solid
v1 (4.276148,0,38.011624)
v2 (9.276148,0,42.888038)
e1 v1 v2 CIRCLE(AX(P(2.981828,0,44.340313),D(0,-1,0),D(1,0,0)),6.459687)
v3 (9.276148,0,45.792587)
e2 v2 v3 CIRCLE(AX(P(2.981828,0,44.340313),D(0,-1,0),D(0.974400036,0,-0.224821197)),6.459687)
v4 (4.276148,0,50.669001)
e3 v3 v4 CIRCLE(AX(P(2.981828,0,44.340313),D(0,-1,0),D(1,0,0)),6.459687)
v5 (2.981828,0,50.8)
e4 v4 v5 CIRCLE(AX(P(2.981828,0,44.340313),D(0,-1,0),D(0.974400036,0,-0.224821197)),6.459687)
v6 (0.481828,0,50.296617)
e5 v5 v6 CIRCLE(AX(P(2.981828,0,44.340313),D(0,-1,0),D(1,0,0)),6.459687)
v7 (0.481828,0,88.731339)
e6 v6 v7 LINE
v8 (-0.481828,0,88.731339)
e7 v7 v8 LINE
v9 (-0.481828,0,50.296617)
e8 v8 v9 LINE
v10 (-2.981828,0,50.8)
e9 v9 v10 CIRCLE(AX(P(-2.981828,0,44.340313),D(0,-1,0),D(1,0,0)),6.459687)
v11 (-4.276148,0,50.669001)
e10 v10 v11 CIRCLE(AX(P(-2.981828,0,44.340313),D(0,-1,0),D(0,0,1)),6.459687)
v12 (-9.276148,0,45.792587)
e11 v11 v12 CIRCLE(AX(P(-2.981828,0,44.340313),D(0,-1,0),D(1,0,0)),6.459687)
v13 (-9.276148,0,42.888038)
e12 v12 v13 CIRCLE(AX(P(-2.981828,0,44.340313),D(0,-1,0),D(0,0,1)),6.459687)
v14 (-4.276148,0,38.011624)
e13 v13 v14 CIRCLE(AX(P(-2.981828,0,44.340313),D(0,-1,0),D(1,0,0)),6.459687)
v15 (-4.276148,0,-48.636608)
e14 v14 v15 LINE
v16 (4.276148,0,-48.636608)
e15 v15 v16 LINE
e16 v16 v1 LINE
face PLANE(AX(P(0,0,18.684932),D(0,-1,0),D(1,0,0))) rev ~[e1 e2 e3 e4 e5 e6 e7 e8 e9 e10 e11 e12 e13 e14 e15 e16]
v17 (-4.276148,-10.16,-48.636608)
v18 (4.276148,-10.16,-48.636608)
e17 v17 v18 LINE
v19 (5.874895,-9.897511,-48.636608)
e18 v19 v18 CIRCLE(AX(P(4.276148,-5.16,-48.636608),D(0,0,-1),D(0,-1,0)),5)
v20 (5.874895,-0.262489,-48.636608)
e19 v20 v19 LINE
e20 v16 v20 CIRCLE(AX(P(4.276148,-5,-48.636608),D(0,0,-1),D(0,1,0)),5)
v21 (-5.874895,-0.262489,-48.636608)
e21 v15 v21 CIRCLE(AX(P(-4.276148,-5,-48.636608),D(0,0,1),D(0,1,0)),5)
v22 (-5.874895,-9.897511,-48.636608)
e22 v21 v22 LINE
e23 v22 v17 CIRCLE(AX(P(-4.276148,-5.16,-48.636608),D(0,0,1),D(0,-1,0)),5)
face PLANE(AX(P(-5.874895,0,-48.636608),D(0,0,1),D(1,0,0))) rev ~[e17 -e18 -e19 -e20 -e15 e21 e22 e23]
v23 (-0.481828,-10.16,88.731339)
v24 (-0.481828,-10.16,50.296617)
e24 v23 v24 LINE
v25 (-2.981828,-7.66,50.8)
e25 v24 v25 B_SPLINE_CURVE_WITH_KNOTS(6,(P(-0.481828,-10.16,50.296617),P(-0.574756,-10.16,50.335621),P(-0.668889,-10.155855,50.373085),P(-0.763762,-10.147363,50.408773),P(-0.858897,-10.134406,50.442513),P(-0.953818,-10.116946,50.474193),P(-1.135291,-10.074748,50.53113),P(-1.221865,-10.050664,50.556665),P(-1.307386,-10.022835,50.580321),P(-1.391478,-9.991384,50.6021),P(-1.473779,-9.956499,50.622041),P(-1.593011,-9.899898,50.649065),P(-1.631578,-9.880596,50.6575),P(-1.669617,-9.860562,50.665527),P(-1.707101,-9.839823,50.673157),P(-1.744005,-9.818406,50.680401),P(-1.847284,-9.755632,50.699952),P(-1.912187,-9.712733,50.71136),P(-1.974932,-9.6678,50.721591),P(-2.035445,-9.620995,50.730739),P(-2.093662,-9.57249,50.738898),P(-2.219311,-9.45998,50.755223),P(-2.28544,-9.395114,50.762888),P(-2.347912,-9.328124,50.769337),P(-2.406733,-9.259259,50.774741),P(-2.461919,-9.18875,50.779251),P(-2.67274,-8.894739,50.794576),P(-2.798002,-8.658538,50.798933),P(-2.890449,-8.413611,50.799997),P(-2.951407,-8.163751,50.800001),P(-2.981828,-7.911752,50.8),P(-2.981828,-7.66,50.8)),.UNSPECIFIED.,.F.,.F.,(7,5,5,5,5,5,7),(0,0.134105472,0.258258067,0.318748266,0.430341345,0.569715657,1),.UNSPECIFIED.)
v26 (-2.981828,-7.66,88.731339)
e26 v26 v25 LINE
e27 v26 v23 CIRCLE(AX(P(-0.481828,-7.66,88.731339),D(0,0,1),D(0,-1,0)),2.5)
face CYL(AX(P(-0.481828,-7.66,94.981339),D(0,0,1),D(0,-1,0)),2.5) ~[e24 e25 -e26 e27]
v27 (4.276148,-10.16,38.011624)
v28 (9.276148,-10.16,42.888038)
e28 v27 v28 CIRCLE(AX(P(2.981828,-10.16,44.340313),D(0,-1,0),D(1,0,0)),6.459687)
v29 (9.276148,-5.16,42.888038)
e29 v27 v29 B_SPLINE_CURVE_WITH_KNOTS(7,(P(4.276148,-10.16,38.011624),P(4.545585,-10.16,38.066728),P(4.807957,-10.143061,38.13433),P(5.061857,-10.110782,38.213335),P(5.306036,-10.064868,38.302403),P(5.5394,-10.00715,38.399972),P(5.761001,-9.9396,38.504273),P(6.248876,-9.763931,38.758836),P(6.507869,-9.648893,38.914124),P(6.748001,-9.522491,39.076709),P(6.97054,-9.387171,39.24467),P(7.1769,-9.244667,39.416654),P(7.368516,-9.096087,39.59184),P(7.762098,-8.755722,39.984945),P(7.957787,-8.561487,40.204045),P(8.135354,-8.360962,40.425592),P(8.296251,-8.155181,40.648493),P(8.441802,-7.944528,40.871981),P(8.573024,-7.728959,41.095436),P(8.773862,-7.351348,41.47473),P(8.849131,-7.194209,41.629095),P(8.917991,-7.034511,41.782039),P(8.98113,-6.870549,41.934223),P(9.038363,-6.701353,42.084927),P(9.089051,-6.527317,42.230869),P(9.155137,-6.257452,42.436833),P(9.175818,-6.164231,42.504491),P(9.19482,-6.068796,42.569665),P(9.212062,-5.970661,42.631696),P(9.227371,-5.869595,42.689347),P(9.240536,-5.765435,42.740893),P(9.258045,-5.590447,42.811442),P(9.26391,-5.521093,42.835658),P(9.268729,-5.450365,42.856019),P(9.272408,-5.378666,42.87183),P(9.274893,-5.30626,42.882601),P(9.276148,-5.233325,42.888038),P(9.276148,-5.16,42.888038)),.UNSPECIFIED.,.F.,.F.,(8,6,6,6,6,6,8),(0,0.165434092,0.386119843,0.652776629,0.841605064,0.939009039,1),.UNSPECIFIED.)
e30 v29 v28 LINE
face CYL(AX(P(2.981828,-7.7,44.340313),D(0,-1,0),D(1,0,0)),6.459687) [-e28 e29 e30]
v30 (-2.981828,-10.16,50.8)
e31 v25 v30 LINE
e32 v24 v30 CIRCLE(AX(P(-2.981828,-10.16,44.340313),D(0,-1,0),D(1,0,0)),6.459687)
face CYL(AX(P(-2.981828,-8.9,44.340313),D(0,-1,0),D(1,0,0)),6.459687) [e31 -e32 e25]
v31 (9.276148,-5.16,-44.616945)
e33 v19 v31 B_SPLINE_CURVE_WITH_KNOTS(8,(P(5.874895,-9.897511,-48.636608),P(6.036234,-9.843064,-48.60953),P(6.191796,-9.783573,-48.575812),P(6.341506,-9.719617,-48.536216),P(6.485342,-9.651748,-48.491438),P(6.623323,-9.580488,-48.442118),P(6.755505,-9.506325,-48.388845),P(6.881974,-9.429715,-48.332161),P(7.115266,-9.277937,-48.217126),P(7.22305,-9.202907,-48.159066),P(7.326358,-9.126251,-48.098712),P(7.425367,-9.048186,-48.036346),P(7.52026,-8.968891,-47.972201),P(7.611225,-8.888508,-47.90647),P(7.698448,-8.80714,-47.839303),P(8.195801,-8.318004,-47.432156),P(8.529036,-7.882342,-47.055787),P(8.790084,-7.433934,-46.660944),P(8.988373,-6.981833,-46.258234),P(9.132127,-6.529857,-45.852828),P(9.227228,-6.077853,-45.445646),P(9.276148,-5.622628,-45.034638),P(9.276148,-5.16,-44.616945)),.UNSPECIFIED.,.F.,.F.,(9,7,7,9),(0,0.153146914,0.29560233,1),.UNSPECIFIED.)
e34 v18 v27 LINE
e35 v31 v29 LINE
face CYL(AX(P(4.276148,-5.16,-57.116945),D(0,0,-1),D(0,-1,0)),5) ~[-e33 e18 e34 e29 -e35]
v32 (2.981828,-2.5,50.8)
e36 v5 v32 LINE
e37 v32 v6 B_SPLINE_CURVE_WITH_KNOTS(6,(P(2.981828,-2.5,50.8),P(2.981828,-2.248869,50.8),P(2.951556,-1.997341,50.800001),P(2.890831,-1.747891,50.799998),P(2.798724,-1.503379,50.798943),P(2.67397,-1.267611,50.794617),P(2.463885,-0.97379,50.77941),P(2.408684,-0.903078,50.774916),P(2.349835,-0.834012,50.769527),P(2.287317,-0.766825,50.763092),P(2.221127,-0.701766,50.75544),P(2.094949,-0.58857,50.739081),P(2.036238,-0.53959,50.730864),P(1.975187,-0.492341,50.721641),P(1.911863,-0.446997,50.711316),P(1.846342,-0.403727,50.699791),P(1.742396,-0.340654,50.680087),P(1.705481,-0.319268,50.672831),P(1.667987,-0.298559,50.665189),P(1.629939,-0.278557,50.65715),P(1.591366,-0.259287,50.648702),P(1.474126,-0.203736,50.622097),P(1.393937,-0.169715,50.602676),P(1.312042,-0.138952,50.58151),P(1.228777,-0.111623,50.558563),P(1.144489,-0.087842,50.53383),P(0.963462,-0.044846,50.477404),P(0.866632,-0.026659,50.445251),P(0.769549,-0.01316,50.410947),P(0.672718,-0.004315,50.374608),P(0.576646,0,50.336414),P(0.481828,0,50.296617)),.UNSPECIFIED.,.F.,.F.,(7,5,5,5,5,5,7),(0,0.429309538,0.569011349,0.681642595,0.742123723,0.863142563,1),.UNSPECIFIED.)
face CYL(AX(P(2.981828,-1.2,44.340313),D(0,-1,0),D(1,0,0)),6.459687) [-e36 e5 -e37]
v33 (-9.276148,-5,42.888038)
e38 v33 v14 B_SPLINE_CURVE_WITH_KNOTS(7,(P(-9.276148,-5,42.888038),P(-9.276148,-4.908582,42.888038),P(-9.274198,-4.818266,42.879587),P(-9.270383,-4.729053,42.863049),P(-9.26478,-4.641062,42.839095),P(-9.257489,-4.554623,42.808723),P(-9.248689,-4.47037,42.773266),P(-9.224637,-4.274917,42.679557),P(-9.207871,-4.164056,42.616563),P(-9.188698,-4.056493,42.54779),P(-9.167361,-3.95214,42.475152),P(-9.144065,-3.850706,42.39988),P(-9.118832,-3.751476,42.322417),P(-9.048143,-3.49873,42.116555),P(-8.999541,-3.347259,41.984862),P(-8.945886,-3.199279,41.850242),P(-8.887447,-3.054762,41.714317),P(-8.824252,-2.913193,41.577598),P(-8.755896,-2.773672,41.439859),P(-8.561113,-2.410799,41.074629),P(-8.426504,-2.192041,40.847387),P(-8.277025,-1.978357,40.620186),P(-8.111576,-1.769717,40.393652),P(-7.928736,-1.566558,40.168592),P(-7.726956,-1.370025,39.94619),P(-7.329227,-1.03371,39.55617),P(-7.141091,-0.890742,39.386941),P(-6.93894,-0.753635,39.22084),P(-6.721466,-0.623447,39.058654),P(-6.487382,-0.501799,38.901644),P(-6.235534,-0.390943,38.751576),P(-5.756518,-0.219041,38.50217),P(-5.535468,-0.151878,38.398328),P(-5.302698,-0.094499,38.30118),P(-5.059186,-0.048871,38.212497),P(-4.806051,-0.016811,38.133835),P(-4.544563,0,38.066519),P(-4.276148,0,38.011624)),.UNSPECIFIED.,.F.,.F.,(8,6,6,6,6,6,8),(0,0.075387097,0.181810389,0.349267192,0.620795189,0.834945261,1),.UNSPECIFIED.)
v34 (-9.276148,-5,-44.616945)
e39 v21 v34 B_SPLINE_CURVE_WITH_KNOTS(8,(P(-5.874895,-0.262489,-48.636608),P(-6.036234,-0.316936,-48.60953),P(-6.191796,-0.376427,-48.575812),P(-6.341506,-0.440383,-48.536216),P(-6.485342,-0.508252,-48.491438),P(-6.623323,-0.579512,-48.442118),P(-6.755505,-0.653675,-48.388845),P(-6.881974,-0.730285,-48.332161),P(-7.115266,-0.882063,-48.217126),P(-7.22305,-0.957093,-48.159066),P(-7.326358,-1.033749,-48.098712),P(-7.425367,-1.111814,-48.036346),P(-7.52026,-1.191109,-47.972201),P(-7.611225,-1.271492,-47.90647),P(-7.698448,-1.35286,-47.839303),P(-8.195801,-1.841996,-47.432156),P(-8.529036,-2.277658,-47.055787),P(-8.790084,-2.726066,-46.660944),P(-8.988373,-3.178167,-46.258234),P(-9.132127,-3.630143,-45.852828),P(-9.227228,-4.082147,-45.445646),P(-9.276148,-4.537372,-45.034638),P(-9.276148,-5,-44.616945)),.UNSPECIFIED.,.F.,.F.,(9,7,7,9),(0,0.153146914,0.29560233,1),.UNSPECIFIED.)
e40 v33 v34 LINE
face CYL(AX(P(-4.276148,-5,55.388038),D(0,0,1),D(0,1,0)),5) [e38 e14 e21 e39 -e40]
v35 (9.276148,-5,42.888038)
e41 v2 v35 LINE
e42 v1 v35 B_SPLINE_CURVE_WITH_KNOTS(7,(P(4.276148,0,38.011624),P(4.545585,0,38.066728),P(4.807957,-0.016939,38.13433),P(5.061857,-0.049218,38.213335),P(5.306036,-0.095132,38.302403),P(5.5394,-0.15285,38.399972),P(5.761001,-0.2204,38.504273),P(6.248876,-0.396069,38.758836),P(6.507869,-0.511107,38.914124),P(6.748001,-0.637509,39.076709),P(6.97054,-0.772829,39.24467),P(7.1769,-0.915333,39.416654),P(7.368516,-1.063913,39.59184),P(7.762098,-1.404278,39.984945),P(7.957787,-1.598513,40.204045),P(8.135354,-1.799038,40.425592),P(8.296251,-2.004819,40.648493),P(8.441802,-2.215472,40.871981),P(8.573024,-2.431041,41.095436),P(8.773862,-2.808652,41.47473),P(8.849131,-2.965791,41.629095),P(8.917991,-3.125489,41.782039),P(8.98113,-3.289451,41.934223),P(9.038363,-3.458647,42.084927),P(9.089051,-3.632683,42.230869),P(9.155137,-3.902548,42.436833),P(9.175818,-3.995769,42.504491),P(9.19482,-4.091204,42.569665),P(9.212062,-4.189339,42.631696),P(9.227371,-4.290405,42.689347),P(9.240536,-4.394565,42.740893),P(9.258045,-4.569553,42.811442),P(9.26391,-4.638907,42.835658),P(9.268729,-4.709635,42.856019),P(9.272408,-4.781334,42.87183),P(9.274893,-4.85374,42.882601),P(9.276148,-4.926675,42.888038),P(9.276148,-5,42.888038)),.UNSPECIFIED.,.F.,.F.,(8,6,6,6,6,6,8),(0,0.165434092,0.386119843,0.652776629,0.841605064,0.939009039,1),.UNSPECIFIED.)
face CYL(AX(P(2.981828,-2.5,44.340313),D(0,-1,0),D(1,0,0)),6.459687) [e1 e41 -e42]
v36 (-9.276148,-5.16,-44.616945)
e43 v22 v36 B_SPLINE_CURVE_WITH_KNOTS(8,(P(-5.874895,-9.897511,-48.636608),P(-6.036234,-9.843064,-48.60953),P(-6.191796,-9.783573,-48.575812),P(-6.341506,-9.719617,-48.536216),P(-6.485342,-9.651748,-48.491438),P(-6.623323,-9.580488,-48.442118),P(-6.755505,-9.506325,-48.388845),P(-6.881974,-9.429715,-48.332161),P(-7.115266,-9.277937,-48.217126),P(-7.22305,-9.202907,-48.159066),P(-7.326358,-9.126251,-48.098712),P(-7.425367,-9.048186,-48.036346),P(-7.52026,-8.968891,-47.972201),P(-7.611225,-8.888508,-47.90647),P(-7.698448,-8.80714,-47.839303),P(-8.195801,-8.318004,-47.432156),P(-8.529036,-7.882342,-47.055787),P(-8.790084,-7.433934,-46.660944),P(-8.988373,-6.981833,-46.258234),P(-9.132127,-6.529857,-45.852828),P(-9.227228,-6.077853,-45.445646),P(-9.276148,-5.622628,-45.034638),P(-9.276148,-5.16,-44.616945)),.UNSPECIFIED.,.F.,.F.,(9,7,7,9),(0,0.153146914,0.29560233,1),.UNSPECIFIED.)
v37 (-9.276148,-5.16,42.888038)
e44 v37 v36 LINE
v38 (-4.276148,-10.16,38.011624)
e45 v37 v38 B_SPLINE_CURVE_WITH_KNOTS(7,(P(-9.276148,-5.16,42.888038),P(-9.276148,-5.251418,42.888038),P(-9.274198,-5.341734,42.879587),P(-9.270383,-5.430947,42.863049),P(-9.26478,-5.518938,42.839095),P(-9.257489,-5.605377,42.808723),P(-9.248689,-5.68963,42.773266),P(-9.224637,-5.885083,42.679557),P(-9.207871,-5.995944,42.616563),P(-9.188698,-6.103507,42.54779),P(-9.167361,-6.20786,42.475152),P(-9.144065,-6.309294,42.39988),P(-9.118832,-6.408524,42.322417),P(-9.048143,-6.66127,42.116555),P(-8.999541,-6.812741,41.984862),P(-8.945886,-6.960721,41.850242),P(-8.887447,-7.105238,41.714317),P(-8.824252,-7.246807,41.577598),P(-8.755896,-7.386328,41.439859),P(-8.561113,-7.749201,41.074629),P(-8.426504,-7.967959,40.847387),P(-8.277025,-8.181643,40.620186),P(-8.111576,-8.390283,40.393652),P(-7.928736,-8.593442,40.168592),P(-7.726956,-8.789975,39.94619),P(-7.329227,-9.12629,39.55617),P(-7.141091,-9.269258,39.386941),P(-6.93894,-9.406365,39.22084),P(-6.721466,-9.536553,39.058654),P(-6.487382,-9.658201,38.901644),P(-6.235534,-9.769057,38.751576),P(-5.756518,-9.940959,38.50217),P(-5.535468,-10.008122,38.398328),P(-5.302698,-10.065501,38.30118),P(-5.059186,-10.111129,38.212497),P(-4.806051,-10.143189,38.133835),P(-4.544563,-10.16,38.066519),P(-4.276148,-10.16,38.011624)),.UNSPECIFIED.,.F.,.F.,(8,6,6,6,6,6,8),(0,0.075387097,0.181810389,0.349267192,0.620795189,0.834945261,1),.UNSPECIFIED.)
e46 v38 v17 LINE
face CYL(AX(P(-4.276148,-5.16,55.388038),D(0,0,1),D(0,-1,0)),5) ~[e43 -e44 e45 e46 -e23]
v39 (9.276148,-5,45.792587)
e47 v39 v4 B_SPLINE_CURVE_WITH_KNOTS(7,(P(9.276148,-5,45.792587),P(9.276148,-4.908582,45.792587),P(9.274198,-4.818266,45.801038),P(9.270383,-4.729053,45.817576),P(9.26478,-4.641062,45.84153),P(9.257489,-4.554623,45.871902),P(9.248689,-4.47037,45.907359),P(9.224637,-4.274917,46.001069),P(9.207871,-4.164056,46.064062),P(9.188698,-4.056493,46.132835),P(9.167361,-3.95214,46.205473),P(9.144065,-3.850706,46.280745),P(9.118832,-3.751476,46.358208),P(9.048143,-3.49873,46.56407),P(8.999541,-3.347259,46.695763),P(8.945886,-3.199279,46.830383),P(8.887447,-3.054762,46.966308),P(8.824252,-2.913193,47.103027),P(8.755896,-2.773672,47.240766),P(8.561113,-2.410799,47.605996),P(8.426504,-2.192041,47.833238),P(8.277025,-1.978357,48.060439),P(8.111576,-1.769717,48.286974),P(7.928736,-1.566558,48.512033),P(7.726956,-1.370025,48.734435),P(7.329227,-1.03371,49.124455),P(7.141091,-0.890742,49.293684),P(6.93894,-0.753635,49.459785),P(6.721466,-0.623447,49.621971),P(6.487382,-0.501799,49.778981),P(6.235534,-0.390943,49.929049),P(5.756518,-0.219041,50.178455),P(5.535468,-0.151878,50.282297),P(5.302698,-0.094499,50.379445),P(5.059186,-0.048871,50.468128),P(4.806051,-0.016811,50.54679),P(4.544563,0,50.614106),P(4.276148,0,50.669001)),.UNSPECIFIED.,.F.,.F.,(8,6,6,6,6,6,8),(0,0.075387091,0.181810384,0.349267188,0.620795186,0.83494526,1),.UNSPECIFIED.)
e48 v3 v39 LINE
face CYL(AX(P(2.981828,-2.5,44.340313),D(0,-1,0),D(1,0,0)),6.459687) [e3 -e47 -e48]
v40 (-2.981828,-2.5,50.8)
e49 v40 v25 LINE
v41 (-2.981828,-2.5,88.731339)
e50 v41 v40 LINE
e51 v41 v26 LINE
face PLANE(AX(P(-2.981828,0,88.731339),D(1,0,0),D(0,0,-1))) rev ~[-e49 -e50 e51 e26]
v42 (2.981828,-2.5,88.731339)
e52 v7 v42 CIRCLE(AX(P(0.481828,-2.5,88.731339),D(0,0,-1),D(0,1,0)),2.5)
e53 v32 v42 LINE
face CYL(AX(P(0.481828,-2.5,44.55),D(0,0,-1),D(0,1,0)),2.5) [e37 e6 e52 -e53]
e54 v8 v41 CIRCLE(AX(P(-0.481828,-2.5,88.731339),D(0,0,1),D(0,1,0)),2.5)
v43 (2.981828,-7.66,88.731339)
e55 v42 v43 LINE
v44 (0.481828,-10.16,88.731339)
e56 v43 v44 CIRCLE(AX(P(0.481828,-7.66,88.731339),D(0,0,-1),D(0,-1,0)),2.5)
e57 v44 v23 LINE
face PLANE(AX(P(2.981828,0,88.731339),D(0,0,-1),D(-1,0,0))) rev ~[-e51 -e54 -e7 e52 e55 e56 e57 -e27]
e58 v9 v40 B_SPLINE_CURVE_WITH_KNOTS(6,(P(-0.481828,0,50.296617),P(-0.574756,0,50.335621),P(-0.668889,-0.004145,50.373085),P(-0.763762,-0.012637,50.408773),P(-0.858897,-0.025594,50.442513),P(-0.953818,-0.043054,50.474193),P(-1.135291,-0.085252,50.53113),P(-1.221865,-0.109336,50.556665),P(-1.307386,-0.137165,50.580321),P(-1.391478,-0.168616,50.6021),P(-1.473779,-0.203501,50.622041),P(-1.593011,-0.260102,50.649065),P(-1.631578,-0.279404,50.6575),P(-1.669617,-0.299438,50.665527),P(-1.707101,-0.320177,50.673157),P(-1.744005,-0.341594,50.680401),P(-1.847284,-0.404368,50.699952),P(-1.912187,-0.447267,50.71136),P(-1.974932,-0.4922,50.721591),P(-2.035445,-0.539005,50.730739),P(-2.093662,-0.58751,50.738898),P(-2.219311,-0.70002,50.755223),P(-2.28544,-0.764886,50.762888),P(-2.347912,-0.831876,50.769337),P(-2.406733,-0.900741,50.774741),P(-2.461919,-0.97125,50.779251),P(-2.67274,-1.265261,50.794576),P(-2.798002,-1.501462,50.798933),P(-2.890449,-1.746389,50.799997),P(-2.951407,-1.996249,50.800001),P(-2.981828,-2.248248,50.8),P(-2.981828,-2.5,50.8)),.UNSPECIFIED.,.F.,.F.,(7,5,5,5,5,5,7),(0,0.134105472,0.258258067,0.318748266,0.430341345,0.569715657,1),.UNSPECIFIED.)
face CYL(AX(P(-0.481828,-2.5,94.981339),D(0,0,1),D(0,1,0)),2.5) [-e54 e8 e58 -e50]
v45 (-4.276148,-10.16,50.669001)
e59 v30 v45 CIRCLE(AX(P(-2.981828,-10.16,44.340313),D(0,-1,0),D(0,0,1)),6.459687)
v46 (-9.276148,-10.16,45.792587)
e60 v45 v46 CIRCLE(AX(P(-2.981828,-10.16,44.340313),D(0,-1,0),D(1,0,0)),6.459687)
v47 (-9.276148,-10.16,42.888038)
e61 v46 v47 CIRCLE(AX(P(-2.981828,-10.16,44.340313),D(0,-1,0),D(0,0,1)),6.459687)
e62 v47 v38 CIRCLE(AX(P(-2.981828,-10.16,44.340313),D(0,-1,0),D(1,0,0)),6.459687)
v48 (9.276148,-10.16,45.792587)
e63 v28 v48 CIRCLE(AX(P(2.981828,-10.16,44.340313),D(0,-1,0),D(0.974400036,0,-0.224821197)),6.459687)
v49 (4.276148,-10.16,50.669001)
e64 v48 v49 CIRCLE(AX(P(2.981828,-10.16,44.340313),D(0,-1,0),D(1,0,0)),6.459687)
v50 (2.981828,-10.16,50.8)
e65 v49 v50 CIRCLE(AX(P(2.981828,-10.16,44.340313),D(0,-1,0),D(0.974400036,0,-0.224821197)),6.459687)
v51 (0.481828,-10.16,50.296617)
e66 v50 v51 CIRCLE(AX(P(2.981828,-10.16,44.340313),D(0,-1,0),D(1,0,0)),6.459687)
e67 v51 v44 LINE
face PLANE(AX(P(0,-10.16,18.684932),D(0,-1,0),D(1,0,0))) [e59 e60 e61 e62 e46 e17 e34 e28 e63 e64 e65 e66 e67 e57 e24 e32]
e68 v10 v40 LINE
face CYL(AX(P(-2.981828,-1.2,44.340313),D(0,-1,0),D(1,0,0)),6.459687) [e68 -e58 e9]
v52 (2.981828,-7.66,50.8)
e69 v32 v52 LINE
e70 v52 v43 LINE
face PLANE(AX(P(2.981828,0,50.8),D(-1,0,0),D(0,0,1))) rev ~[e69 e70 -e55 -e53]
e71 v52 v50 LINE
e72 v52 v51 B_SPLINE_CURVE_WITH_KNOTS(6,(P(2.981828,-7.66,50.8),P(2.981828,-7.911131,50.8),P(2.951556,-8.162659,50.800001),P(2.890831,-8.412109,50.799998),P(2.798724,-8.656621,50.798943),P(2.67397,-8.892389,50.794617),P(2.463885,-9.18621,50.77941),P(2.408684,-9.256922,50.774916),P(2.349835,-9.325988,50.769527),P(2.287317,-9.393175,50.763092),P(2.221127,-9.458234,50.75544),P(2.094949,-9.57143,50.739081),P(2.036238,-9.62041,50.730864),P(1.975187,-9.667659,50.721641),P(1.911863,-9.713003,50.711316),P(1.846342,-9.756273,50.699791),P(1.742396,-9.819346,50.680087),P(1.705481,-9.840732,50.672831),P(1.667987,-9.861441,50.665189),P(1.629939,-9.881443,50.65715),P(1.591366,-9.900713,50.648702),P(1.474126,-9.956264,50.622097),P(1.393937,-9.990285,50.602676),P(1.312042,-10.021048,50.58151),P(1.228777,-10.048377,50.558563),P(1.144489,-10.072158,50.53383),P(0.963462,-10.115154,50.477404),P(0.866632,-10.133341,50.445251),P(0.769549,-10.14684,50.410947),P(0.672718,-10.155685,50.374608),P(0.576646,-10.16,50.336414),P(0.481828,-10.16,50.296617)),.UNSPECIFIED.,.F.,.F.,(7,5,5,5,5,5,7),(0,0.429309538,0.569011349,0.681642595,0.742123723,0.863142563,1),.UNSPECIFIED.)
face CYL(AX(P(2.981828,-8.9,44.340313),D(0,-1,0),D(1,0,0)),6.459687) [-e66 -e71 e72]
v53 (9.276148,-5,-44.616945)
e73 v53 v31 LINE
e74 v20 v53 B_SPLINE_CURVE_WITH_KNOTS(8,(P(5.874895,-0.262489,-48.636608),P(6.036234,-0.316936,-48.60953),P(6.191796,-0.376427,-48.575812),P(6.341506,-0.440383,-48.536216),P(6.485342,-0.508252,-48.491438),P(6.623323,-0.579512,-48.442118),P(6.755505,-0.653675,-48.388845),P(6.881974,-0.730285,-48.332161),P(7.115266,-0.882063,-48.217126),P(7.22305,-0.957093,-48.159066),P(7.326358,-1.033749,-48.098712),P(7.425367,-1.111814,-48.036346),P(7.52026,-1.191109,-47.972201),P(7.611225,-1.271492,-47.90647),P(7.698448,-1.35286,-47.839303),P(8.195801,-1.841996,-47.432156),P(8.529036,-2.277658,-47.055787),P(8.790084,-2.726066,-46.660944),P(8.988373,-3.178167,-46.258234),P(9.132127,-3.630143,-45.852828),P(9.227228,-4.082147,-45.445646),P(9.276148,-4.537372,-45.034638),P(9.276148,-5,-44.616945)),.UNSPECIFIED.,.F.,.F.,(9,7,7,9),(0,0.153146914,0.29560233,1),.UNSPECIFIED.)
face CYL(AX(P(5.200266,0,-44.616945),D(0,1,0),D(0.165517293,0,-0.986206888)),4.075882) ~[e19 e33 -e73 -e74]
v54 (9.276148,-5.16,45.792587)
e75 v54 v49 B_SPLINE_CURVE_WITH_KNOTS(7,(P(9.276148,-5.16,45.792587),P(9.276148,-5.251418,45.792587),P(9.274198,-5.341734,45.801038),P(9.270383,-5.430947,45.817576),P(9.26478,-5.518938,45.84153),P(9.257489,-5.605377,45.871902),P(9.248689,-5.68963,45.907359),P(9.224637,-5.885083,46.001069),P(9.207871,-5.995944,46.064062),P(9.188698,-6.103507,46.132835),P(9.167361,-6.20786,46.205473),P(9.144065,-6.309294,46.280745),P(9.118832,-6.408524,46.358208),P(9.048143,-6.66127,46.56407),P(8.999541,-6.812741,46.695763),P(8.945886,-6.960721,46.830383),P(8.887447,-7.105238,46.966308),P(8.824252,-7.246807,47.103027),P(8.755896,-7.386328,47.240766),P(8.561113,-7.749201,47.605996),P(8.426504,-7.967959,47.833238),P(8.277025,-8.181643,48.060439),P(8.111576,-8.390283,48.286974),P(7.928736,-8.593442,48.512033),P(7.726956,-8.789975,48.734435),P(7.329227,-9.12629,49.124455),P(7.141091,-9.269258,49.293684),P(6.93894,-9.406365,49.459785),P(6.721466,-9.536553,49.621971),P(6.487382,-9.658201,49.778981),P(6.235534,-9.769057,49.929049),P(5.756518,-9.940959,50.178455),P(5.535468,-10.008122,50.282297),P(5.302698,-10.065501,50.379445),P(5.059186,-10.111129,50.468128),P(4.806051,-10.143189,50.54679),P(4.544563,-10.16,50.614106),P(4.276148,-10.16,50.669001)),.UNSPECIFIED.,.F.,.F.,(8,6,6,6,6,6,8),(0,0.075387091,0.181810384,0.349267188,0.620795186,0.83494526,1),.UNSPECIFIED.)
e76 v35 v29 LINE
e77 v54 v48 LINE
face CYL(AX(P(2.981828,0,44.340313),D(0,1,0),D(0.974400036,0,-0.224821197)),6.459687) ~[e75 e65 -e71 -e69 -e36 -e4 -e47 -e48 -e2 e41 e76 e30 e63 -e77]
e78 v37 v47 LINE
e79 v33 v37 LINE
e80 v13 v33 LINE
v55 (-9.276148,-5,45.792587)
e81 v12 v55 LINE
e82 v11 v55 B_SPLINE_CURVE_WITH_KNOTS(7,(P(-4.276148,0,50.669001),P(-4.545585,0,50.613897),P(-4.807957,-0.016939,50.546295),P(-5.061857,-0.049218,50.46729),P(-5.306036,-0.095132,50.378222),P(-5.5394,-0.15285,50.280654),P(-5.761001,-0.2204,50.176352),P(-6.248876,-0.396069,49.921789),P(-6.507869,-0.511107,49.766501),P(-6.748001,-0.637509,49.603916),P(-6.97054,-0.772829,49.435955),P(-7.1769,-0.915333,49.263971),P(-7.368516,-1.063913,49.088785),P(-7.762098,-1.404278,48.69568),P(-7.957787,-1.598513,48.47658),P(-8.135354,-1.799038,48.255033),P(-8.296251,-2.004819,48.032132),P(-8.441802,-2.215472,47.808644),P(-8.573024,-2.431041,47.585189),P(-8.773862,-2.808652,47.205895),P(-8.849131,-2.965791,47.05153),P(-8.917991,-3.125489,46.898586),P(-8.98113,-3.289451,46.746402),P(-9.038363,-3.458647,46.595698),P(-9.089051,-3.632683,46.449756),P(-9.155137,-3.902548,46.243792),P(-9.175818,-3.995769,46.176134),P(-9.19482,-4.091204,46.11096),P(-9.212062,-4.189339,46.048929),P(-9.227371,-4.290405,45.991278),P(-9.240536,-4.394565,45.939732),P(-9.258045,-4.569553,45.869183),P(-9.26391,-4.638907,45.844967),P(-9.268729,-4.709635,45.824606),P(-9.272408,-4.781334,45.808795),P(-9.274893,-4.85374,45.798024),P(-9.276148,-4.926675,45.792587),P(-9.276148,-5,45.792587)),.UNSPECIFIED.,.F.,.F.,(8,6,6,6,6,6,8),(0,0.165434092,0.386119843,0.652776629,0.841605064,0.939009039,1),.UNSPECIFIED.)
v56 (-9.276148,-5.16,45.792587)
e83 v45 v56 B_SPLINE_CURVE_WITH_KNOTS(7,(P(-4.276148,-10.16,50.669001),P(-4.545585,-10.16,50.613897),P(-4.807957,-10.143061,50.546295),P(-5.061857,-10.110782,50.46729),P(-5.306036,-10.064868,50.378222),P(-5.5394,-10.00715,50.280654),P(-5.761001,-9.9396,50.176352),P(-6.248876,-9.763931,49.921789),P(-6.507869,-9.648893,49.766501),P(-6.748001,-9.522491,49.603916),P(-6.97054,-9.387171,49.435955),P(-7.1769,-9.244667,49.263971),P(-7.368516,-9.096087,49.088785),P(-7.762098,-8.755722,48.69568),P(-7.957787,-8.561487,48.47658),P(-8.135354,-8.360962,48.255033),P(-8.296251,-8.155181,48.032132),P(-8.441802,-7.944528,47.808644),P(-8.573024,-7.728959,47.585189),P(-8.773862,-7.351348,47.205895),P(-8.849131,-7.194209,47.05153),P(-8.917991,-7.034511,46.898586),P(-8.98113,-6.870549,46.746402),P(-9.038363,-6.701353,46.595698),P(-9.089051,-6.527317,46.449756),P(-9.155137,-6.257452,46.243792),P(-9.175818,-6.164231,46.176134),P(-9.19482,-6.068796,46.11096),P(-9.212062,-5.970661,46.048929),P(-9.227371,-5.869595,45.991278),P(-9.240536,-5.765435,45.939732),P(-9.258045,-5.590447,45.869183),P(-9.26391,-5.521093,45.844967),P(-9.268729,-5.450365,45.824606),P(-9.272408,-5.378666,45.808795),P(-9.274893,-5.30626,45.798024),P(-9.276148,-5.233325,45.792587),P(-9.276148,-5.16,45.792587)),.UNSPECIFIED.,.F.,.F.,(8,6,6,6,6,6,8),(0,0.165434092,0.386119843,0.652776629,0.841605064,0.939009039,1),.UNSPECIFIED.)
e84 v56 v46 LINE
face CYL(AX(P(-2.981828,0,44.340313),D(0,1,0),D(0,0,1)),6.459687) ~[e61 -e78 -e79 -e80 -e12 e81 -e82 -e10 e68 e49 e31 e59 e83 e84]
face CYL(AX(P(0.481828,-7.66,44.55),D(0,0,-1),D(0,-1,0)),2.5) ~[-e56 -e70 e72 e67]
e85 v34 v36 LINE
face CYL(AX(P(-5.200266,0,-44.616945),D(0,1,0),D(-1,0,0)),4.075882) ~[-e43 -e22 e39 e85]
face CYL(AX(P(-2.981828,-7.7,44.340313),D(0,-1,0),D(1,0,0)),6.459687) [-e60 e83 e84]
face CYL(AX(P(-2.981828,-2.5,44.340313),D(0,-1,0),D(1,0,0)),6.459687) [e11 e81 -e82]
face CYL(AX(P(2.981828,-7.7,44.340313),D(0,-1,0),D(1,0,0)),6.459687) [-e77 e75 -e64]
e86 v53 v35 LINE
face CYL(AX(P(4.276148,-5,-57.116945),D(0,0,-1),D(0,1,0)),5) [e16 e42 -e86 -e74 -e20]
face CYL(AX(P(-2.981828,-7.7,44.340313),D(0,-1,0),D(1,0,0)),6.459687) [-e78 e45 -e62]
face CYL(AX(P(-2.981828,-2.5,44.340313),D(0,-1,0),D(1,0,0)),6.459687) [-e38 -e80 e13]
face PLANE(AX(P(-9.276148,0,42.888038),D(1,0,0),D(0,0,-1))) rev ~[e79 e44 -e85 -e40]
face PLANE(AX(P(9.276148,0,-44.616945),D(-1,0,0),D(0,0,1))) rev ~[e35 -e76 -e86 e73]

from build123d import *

# Parameters (mm, degrees)
F1_DEPTH     = 10.16
F2_T4_DEPTH  = 50.4313390776
F2_S5_R      = 6.4596874697
F2_T6_DEPTH  = 27
F2_T10_DEPTH = 50.4313390776
F2_S11_R     = 6.4596874697
F2_T12_DEPTH = 27
F2_T16_DEPTH = 50.4313390776
F2_S17_R     = 6.4596874697
F2_T18_DEPTH = 27
F2_T22_DEPTH = 50.4313390776
F2_S23_R     = 6.4596874697
F2_T24_DEPTH = 27
F3_T4_DEPTH  = 112.5049829483
F3_S5_R      = 6.4596874697
F3_T6_DEPTH  = 58
F3_T10_DEPTH = 112.5049829483
F3_S11_R     = 6.4596874697
F3_T12_DEPTH = 58
F3_T16_DEPTH = 112.5049829483
F3_S17_R     = 6.4596874697
F3_T18_DEPTH = 58
F3_T22_DEPTH = 112.5049829483
F3_S23_R     = 6.4596874697
F3_T24_DEPTH = 58


# Not quite as in the source:
# - a fillet or chamfer that OpenCascade refuses, or shapes differently, is made with other operations: its cross-section is extruded or revolved along the edge and cut away or added


with BuildPart() as f1:
    # F0 (on Front) → F1 (new body)
    with BuildSketch(Plane.XZ):
        with BuildLine():
            Line((-2.9818282316, 88.7313390776), (-2.9818282316, 50.8))
            ThreePointArc((-2.9818282316, 50.8), (-8.0369643669, 48.3618993886), (-9.2761479318, 42.8880378604))
            Line((-9.2761479318, 42.8880378604), (-9.2761479318, -44.6169450879))
            ThreePointArc((-9.2761479318, -44.6169450879), (-8.3117384594, -47.249729254), (-5.874895025, -48.6366078258))
            Line((-5.874895025, -48.6366078258), (0, -48.6366078258))
            Line((0, -48.6366078258), (5.874895025, -48.6366078258))
            ThreePointArc((5.874895025, -48.6366078258), (8.3117384594, -47.249729254), (9.2761479318, -44.6169450879))
            Line((9.2761479318, -44.6169450879), (9.2761479318, 42.8880378604))
            ThreePointArc((9.2761479318, 42.8880378604), (8.0369643669, 48.3618993886), (2.9818282316, 50.8))
            Line((2.9818282316, 50.8), (2.9818282316, 88.7313390776))
            Line((2.9818282316, 88.7313390776), (-2.9818282316, 88.7313390776))
        make_face()
    extrude(amount=F1_DEPTH)

    # F2: fillet of radius 2.5 on 4 edges, made by hand


with BuildPart() as f2_tool2:
    # F2_s3 → F2_t4 (new body)
    with BuildSketch(Plane.XY.offset(94.9813390776)):
        with BuildLine():
            ThreePointArc((-0.4818282316, 0), (-2.2495951845, -0.732233047), (-2.9818282316, -2.5))
            Line((-2.9818282316, -2.5), (-2.9818282316, 0))
            Line((-2.9818282316, 0), (-0.4818282316, 0))
        make_face()
    extrude(amount=-F2_T4_DEPTH)

    # F2_s5 → F2_t6 (cut, symmetric)
    with BuildSketch(Plane.XZ.offset(1.2)):
        with Locations((-2.9818282316, 44.3403125303)):
            Circle(F2_S5_R)
    extrude(amount=F2_T6_DEPTH, both=True, mode=Mode.SUBTRACT)


with BuildPart() as f1_1:
    add(f1.part)

    # F2_t1: cut F2_tool2
    add(f2_tool2.part, mode=Mode.SUBTRACT)


with BuildPart() as f2_tool8:
    # F2_s9 → F2_t10 (new body)
    with BuildSketch(Plane.XY.offset(44.55)):
        with BuildLine():
            ThreePointArc((0.4818282316, -10.16), (2.2495951845, -9.427766953), (2.9818282316, -7.66))
            Line((2.9818282316, -7.66), (2.9818282316, -10.16))
            Line((2.9818282316, -10.16), (0.4818282316, -10.16))
        make_face()
    extrude(amount=F2_T10_DEPTH)

    # F2_s11 → F2_t12 (cut, symmetric)
    with BuildSketch(Plane.XZ.offset(8.9)):
        with Locations((2.9818282316, 44.3403125303)):
            Circle(F2_S11_R)
    extrude(amount=F2_T12_DEPTH, both=True, mode=Mode.SUBTRACT)


with BuildPart() as f1_2:
    add(f1_1.part)

    # F2_t7: cut F2_tool8
    add(f2_tool8.part, mode=Mode.SUBTRACT)


with BuildPart() as f2_tool14:
    # F2_s15 → F2_t16 (new body)
    with BuildSketch(Plane.XY.offset(94.9813390776)):
        with BuildLine():
            ThreePointArc((-0.4818282316, -10.16), (-2.2495951845, -9.427766953), (-2.9818282316, -7.66))
            Line((-2.9818282316, -7.66), (-2.9818282316, -10.16))
            Line((-2.9818282316, -10.16), (-0.4818282316, -10.16))
        make_face()
    extrude(amount=-F2_T16_DEPTH)

    # F2_s17 → F2_t18 (cut, symmetric)
    with BuildSketch(Plane.XZ.offset(8.9)):
        with Locations((-2.9818282316, 44.3403125303)):
            Circle(F2_S17_R)
    extrude(amount=F2_T18_DEPTH, both=True, mode=Mode.SUBTRACT)


with BuildPart() as f1_3:
    add(f1_2.part)

    # F2_t13: cut F2_tool14
    add(f2_tool14.part, mode=Mode.SUBTRACT)


with BuildPart() as f2_tool20:
    # F2_s21 → F2_t22 (new body)
    with BuildSketch(Plane.XY.offset(44.55)):
        with BuildLine():
            ThreePointArc((0.4818282316, 0), (2.2495951845, -0.732233047), (2.9818282316, -2.5))
            Line((2.9818282316, -2.5), (2.9818282316, 0))
            Line((2.9818282316, 0), (0.4818282316, 0))
        make_face()
    extrude(amount=F2_T22_DEPTH)

    # F2_s23 → F2_t24 (cut, symmetric)
    with BuildSketch(Plane.XZ.offset(1.2)):
        with Locations((2.9818282316, 44.3403125303)):
            Circle(F2_S23_R)
    extrude(amount=F2_T24_DEPTH, both=True, mode=Mode.SUBTRACT)


with BuildPart() as f1_4:
    add(f1_3.part)

    # F2_t19: cut F2_tool20
    add(f2_tool20.part, mode=Mode.SUBTRACT)

    # F3: fillet of radius 5 on 4 edges, made by hand


with BuildPart() as f3_tool2:
    # F3_s3 → F3_t4 (new body)
    with BuildSketch(Plane.XY.offset(55.3880378604)):
        with BuildLine():
            ThreePointArc((-4.2761479318, 0), (-7.8116818377, -1.4644660941), (-9.2761479318, -5))
            Line((-9.2761479318, -5), (-9.2761479318, 0))
            Line((-9.2761479318, 0), (-4.2761479318, 0))
        make_face()
    extrude(amount=-F3_T4_DEPTH)

    # F3_s5 → F3_t6 (cut, symmetric)
    with BuildSketch(Plane.XZ.offset(2.5)):
        with Locations((-2.9818282316, 44.3403125303)):
            Circle(F3_S5_R)
    extrude(amount=F3_T6_DEPTH, both=True, mode=Mode.SUBTRACT)


with BuildPart() as f1_5:
    add(f1_4.part)

    # F3_t1: cut F3_tool2
    add(f3_tool2.part, mode=Mode.SUBTRACT)


with BuildPart() as f3_tool8:
    # F3_s9 → F3_t10 (new body)
    with BuildSketch(Plane.XY.offset(-57.1169450879)):
        with BuildLine():
            ThreePointArc((4.2761479318, 0), (7.8116818377, -1.4644660941), (9.2761479318, -5))
            Line((9.2761479318, -5), (9.2761479318, 0))
            Line((9.2761479318, 0), (4.2761479318, 0))
        make_face()
    extrude(amount=F3_T10_DEPTH)

    # F3_s11 → F3_t12 (cut, symmetric)
    with BuildSketch(Plane.XZ.offset(2.5)):
        with Locations((2.9818282316, 44.3403125303)):
            Circle(F3_S11_R)
    extrude(amount=F3_T12_DEPTH, both=True, mode=Mode.SUBTRACT)


with BuildPart() as f1_6:
    add(f1_5.part)

    # F3_t7: cut F3_tool8
    add(f3_tool8.part, mode=Mode.SUBTRACT)


with BuildPart() as f3_tool14:
    # F3_s15 → F3_t16 (new body)
    with BuildSketch(Plane.XY.offset(55.3880378604)):
        with BuildLine():
            ThreePointArc((-4.2761479318, -10.16), (-7.8116818377, -8.6955339059), (-9.2761479318, -5.16))
            Line((-9.2761479318, -5.16), (-9.2761479318, -10.16))
            Line((-9.2761479318, -10.16), (-4.2761479318, -10.16))
        make_face()
    extrude(amount=-F3_T16_DEPTH)

    # F3_s17 → F3_t18 (cut, symmetric)
    with BuildSketch(Plane.XZ.offset(7.7)):
        with Locations((-2.9818282316, 44.3403125303)):
            Circle(F3_S17_R)
    extrude(amount=F3_T18_DEPTH, both=True, mode=Mode.SUBTRACT)


with BuildPart() as f1_7:
    add(f1_6.part)

    # F3_t13: cut F3_tool14
    add(f3_tool14.part, mode=Mode.SUBTRACT)


with BuildPart() as f3_tool20:
    # F3_s21 → F3_t22 (new body)
    with BuildSketch(Plane.XY.offset(-57.1169450879)):
        with BuildLine():
            ThreePointArc((4.2761479318, -10.16), (7.8116818377, -8.6955339059), (9.2761479318, -5.16))
            Line((9.2761479318, -5.16), (9.2761479318, -10.16))
            Line((9.2761479318, -10.16), (4.2761479318, -10.16))
        make_face()
    extrude(amount=F3_T22_DEPTH)

    # F3_s23 → F3_t24 (cut, symmetric)
    with BuildSketch(Plane.XZ.offset(7.7)):
        with Locations((2.9818282316, 44.3403125303)):
            Circle(F3_S23_R)
    extrude(amount=F3_T24_DEPTH, both=True, mode=Mode.SUBTRACT)


with BuildPart() as f1_8:
    add(f1_7.part)

    # F3_t19: cut F3_tool20
    add(f3_tool20.part, mode=Mode.SUBTRACT)


solid = f1_8.part
